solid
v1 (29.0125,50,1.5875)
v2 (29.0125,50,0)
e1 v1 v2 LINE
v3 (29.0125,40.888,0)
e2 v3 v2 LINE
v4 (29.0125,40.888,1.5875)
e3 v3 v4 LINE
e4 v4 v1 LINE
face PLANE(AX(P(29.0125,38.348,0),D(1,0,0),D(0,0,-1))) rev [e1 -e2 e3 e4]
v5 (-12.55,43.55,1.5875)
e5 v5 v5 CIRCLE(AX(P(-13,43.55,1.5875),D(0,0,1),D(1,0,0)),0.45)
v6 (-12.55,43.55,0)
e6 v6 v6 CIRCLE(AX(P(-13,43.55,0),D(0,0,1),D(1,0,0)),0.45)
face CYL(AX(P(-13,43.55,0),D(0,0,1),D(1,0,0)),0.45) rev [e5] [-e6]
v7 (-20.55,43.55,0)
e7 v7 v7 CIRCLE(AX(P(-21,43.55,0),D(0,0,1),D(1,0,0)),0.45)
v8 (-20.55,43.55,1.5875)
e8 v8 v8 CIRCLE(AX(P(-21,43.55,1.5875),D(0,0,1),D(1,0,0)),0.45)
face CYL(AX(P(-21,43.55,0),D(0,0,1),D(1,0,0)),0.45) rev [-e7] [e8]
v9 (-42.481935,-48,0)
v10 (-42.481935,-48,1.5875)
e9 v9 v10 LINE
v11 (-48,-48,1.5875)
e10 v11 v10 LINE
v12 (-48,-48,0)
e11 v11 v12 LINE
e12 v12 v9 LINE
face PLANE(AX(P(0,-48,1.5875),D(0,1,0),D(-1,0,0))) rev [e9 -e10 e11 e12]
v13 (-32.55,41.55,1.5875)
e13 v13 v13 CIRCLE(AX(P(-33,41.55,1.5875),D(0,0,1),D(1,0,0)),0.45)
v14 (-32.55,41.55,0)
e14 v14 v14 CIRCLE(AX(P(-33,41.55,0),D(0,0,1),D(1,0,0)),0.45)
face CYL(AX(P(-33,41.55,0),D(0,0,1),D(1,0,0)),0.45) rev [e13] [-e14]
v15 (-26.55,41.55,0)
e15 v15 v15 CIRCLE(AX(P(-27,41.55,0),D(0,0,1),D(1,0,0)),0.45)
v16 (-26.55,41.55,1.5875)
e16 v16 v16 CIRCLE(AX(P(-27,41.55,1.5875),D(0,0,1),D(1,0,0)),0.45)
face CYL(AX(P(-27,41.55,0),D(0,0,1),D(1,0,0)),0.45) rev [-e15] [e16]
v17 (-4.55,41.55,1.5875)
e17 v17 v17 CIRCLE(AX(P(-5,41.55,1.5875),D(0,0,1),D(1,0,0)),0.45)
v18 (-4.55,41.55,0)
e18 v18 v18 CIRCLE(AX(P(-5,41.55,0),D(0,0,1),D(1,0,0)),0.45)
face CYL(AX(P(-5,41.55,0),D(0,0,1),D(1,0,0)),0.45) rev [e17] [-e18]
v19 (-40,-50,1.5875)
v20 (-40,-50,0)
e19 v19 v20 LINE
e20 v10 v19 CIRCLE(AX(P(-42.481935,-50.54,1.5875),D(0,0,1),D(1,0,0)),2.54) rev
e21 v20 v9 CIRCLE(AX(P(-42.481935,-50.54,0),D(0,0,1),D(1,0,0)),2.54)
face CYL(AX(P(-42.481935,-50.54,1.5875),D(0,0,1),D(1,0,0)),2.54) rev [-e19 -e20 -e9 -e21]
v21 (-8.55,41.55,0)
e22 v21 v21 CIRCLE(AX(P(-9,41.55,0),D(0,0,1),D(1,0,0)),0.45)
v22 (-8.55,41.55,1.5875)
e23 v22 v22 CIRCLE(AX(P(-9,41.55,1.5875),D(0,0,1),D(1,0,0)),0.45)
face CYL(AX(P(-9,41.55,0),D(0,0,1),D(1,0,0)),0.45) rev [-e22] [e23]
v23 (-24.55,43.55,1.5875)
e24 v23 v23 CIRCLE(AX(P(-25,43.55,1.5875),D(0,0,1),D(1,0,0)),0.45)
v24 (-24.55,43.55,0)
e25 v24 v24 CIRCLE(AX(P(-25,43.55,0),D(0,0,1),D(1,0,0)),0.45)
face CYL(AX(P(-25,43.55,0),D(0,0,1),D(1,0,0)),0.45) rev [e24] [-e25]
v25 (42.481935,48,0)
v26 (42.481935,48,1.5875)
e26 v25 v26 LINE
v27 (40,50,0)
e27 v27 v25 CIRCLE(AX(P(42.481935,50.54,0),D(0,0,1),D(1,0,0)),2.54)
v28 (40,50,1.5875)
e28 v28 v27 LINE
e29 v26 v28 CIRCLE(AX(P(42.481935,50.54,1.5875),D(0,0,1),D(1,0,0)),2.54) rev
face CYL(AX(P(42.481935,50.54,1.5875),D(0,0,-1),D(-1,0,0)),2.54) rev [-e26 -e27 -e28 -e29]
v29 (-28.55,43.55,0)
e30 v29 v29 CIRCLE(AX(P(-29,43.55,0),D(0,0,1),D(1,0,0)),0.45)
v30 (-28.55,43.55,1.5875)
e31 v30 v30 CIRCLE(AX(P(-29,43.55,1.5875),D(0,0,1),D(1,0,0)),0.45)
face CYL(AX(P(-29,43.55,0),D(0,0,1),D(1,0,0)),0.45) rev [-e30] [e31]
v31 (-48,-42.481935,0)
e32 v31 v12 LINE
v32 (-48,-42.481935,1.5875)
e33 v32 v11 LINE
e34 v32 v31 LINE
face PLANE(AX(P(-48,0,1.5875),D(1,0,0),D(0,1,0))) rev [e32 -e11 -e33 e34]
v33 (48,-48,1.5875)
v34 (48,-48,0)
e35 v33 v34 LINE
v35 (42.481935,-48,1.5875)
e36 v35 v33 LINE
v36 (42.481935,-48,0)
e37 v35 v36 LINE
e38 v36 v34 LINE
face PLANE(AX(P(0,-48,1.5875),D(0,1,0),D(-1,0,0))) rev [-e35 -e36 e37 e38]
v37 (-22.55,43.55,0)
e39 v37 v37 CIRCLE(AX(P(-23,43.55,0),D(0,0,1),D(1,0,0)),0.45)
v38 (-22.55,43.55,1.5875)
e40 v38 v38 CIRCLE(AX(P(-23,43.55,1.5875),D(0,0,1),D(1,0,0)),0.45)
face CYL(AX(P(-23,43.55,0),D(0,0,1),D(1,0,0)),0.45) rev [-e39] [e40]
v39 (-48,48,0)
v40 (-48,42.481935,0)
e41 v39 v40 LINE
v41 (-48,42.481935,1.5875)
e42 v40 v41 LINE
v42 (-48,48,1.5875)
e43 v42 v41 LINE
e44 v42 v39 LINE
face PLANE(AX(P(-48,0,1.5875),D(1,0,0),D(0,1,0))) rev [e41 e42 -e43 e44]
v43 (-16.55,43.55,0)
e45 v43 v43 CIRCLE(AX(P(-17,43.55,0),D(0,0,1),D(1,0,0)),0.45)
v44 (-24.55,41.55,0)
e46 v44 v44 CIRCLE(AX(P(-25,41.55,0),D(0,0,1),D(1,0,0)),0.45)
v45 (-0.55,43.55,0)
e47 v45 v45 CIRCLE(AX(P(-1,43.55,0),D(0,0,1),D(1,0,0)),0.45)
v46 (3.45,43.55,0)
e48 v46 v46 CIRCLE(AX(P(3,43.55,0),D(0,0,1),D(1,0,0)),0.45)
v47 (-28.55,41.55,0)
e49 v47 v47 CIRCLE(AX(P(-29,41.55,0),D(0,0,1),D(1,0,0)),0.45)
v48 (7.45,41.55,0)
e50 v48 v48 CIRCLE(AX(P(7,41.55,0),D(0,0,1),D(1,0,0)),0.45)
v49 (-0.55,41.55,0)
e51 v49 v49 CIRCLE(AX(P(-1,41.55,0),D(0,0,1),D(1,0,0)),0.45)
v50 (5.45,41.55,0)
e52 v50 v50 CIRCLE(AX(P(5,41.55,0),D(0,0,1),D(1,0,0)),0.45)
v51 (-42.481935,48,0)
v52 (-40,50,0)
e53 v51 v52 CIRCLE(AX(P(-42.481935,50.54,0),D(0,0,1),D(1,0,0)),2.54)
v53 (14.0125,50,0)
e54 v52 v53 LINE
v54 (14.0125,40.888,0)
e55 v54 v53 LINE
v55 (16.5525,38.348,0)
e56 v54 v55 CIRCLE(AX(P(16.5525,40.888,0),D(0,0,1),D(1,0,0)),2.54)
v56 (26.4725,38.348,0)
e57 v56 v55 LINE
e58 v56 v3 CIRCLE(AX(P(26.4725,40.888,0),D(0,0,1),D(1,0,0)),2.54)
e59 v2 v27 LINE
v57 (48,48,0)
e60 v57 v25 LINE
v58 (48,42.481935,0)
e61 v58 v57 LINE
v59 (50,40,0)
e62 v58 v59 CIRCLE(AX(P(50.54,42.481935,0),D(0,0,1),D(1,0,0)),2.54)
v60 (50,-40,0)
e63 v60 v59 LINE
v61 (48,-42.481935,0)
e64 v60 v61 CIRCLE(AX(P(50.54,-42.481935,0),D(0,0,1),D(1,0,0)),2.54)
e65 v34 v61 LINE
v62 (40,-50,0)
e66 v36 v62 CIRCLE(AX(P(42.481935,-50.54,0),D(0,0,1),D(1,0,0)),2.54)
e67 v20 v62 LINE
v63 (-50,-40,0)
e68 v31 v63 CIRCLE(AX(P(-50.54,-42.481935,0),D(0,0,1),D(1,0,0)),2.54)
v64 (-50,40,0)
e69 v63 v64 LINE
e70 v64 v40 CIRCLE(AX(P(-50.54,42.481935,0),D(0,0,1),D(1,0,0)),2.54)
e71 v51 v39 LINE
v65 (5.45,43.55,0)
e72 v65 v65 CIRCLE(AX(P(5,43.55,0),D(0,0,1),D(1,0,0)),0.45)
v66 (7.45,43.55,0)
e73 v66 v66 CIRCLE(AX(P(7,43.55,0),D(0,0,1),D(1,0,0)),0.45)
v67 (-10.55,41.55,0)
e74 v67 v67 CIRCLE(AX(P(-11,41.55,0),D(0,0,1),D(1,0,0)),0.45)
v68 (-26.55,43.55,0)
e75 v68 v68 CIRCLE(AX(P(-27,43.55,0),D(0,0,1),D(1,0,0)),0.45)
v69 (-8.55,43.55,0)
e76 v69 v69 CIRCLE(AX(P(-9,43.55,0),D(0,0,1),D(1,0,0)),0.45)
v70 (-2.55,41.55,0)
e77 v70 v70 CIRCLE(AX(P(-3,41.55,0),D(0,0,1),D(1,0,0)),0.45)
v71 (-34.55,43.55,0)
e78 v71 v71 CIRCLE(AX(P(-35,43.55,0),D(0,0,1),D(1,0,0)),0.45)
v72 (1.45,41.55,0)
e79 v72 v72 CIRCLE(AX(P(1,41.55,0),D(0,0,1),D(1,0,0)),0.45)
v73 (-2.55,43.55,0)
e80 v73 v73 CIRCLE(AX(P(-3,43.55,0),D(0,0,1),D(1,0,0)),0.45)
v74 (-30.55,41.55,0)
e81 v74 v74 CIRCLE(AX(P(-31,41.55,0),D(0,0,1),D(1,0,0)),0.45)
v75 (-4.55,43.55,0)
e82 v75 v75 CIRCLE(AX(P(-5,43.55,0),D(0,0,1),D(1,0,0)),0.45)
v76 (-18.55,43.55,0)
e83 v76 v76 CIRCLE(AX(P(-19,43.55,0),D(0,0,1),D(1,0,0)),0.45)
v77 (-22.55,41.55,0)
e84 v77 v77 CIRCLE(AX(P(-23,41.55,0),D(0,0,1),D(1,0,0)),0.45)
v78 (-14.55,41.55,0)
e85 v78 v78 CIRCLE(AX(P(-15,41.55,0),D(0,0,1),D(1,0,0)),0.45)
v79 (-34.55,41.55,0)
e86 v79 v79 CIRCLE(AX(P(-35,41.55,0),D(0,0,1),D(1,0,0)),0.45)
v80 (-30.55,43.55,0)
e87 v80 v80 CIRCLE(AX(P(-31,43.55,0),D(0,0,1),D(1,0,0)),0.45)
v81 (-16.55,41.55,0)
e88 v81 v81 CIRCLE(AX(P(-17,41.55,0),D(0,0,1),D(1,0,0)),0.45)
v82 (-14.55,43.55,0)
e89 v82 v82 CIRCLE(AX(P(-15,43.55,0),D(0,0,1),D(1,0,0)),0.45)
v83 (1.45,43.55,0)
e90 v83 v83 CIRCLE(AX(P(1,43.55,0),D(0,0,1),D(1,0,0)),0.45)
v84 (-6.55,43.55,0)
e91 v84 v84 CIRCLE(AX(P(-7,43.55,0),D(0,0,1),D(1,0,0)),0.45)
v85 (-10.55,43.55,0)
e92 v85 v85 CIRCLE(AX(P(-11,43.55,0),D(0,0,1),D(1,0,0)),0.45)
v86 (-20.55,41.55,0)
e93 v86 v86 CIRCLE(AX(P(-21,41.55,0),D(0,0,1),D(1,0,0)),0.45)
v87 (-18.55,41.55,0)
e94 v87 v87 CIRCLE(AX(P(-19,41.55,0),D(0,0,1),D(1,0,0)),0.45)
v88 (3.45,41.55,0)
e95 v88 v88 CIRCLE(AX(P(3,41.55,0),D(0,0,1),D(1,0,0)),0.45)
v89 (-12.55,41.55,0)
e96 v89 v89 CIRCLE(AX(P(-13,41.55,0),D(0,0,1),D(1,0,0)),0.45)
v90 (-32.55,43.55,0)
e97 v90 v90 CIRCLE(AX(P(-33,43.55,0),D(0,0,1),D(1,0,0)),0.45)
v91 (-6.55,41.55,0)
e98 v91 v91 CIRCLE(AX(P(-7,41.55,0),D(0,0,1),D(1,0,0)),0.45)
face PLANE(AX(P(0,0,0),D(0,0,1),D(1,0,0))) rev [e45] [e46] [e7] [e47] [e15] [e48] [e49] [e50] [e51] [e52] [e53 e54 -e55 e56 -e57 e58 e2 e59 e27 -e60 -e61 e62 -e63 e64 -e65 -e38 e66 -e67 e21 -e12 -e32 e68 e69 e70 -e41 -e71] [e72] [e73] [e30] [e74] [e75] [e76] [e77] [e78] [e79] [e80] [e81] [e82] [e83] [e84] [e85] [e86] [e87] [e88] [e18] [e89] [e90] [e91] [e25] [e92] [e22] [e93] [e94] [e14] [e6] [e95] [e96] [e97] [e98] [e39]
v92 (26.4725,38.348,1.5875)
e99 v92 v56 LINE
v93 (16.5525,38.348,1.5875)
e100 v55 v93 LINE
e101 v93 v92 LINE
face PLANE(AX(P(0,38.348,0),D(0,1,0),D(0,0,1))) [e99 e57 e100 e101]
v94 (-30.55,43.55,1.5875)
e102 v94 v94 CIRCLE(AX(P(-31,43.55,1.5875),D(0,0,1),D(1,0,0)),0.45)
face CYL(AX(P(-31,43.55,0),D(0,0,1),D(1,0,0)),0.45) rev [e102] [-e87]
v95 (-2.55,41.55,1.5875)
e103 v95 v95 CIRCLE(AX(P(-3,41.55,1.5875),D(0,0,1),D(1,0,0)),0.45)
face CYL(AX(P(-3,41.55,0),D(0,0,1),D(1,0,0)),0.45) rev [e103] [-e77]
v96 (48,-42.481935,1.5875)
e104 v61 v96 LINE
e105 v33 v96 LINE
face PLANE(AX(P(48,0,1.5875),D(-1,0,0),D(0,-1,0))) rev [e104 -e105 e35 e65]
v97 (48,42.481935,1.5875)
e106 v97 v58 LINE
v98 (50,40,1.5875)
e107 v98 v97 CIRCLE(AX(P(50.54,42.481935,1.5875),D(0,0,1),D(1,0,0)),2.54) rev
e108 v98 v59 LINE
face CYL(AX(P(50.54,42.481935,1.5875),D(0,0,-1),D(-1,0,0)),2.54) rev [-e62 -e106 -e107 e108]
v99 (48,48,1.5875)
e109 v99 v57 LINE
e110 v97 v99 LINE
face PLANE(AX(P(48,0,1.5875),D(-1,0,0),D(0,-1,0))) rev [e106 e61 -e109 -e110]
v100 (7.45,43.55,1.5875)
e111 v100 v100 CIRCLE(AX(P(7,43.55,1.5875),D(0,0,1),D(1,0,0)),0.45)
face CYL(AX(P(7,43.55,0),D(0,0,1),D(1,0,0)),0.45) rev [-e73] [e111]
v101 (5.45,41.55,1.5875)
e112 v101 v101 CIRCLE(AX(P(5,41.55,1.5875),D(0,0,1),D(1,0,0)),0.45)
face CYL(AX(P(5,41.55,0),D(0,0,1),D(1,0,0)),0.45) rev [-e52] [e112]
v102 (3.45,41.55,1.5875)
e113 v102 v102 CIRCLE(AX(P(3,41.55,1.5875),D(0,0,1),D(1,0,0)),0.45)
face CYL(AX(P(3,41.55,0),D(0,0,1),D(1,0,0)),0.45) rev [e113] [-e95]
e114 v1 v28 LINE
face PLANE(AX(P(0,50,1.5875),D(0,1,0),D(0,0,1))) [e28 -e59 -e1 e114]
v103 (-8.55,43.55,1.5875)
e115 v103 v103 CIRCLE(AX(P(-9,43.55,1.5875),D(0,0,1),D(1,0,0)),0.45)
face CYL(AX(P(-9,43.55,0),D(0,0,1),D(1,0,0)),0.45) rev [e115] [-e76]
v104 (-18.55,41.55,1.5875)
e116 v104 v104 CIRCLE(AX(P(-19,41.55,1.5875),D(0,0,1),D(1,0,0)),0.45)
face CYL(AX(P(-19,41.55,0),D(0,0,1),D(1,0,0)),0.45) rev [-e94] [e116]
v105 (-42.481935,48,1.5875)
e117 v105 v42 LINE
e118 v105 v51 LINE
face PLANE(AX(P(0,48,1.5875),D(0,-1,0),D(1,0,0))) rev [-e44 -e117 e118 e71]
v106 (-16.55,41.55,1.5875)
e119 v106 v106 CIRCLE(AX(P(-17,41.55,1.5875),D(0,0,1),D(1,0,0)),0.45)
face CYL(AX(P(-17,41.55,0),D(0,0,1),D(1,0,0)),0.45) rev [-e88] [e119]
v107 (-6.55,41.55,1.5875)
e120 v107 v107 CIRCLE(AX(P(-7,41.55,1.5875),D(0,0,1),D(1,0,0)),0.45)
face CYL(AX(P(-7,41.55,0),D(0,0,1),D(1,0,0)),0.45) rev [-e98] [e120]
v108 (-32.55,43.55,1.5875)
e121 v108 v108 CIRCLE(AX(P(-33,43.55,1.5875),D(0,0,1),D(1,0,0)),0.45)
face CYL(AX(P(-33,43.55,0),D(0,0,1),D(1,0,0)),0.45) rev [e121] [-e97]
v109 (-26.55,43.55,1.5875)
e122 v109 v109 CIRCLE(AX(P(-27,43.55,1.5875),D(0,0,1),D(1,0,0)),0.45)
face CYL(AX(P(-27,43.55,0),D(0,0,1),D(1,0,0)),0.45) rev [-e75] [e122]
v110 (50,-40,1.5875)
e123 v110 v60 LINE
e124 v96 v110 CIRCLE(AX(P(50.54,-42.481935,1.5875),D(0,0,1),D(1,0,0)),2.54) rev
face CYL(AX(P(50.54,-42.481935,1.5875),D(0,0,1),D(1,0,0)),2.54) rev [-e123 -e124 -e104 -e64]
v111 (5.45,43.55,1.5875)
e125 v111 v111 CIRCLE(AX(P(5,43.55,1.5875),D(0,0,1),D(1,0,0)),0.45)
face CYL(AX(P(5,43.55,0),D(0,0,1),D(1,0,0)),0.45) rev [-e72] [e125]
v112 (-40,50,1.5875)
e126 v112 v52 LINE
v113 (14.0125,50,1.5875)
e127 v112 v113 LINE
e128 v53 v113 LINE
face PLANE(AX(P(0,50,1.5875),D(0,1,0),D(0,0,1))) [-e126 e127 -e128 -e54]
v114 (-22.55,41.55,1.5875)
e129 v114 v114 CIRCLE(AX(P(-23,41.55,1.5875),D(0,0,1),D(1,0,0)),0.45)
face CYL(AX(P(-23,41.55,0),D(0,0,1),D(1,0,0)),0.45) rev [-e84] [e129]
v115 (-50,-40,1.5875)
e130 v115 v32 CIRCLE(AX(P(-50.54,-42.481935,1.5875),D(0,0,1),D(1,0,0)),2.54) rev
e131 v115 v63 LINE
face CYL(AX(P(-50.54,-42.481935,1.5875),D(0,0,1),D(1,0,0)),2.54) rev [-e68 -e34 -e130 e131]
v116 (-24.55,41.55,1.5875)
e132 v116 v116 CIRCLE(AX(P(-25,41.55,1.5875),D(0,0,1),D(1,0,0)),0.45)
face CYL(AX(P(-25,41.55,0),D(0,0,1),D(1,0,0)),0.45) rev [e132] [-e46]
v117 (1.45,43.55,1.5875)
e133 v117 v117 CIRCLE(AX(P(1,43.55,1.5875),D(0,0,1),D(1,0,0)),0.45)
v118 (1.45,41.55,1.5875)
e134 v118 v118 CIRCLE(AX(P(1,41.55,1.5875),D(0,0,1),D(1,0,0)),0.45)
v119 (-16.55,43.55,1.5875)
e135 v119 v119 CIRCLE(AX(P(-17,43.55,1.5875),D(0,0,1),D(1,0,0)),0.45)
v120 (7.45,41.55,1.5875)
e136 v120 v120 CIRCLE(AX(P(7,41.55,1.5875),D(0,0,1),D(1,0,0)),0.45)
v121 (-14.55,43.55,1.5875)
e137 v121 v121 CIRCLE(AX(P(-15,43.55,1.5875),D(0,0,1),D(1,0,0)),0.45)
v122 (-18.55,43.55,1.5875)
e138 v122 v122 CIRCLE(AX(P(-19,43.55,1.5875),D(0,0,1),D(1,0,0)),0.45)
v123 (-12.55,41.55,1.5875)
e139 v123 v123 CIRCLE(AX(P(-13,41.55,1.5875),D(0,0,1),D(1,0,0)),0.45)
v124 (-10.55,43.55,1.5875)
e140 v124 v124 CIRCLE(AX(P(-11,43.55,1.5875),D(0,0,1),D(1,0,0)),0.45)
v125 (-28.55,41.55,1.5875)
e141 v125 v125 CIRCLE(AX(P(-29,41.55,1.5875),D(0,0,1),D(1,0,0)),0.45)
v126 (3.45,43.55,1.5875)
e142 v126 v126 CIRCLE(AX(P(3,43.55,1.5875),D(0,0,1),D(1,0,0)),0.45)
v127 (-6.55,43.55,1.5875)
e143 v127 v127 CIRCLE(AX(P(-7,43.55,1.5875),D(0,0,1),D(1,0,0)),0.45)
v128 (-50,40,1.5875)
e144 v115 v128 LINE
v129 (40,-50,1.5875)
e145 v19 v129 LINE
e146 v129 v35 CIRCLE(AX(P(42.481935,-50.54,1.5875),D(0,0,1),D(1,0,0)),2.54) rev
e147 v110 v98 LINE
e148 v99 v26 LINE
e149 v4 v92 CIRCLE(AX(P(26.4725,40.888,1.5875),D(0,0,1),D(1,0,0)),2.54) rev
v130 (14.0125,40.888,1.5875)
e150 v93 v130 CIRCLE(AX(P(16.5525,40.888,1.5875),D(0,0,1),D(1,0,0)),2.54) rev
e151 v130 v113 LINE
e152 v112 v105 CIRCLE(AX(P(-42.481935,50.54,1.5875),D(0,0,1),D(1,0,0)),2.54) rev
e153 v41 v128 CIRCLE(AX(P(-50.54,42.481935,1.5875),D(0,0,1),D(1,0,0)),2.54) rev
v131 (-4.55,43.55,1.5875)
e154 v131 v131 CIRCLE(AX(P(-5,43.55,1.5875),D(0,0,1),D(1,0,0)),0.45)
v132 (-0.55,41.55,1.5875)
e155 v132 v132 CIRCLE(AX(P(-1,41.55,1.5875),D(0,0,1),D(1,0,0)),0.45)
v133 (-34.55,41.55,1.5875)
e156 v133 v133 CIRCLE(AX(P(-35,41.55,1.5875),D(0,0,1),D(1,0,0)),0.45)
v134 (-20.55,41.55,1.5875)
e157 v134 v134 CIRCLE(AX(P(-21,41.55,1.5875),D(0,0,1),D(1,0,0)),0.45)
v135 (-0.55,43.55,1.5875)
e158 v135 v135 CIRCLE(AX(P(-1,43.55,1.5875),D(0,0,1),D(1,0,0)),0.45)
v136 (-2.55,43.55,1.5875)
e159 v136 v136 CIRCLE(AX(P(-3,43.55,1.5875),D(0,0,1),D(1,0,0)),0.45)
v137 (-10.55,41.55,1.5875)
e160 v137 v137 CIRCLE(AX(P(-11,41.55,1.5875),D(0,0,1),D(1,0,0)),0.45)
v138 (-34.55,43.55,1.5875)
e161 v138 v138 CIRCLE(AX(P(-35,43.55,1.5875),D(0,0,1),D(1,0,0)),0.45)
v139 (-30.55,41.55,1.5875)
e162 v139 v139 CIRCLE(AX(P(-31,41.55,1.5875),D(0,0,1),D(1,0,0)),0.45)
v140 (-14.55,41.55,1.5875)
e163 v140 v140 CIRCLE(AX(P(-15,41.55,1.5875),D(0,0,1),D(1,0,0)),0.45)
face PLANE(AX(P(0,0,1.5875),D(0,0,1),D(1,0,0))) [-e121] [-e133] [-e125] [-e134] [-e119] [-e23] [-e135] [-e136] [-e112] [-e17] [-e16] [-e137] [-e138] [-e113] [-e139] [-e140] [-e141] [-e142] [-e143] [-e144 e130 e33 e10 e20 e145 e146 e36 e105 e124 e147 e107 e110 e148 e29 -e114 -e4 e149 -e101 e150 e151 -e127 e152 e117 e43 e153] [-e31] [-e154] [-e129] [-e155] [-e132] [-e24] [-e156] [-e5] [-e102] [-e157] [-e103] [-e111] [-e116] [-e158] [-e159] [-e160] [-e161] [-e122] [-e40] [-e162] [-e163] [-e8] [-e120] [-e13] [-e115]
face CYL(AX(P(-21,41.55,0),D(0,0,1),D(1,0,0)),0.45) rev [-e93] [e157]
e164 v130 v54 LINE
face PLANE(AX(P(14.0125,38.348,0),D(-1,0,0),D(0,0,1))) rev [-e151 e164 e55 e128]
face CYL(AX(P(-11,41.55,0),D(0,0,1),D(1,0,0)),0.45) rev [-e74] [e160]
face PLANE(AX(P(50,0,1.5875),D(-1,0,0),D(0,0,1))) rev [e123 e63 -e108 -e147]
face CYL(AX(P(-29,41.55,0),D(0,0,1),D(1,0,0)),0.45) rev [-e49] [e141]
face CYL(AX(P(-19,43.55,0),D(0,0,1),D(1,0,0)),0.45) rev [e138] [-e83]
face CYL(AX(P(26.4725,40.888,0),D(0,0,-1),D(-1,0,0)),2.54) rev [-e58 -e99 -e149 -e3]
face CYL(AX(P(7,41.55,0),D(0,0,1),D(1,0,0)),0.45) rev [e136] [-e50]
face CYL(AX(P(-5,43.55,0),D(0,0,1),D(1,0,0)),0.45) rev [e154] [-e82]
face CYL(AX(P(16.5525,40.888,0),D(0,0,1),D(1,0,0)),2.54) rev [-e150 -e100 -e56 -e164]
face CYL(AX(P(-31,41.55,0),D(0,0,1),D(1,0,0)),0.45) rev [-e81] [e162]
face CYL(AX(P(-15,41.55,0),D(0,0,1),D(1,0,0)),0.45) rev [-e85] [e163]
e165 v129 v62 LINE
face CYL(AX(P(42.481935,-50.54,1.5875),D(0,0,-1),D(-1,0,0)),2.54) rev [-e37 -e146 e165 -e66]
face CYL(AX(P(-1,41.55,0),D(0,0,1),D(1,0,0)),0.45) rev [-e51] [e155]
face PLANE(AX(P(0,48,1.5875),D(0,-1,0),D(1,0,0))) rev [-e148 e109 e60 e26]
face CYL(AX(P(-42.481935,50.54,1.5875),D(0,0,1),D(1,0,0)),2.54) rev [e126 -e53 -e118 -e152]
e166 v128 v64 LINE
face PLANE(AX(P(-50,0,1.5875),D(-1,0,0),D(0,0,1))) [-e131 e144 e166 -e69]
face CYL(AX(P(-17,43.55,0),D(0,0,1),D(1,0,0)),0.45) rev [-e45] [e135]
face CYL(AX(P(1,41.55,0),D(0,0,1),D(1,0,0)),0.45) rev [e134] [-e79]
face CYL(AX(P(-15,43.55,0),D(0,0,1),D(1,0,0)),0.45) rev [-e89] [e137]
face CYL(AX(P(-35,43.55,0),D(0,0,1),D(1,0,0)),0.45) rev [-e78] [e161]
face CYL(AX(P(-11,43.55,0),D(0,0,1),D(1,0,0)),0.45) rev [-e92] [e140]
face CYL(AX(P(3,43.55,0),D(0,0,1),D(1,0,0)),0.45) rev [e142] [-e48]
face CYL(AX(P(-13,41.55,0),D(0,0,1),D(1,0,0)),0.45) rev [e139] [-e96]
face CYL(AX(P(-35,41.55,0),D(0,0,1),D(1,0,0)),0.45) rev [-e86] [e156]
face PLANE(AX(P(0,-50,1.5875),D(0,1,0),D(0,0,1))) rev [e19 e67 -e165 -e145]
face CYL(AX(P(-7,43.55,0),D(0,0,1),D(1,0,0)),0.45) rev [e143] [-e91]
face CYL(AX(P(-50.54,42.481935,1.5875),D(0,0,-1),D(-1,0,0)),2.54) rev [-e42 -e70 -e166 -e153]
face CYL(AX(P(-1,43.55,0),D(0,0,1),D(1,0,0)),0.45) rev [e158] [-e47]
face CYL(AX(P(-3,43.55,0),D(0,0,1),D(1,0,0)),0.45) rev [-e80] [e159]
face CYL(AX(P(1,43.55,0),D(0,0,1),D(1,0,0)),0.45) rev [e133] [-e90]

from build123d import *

# Parameters (mm, degrees)
BOSS_EXTRUDE1_DEPTH = 1.5875
FILLET1_R           = 2.54
SKETCH2_R           = 0.45
CUT_EXTRUDE1_DEPTH  = 71.728496069
SKETCH3_W           = 15
SKETCH3_H           = 1.5875
CUT_EXTRUDE2_DEPTH  = 11.652
FILLET2_R           = 2.54


with BuildPart() as part:
    # Sketch1 → Boss-Extrude1 (new body)
    with BuildSketch(Plane.XY):
        Polygon((40, 50), (-40, 50), (-40, 48), (-48, 48), (-48, 40), (-50, 40), (-50, -37.864895224), (-50, -40), (-48, -40), (-48, -48), (-40, -48), (-40, -50), (-37.864895224, -50), (40, -50), (40, -48), (48, -48), (48, -40), (50, -40), (50, 40), (48, 40), (48, 48), (40, 48), align=None)
    extrude(amount=BOSS_EXTRUDE1_DEPTH)

    # Fillet1
    # the kernel refuses this fillet: 2.54 mm, written as the material it adds along each edge
    with BuildSketch(Plane(origin=(-48, -40, 0), x_dir=(0, -1, 0), z_dir=(0, 0, 1)), Plane(origin=(40, -48, 0), x_dir=(1, 0, 0), z_dir=(0, 0, 1)), Plane(origin=(48, 40, 0), x_dir=(0, 1, 0), z_dir=(0, 0, 1)), Plane(origin=(-40, 48, 0), x_dir=(-1, 0, 0), z_dir=(0, 0, 1))) as fillet1_piece_1:
        with BuildLine():
            CenterArc((2.481934729, -2.54), FILLET1_R, 90, 77.725329785)
            Line((0, -2), (-0.049638695, -1.9892))
            ThreePointArc((-0.049638695, -1.9892), (-0.0508, -1), (-0.0508, 0))
            Line((-0.0508, 0), (0, 0.0508))
            Line((0, 0.0508), (2.481934729, 0.0508))
            Line((2.481934729, 0.0508), (2.481934729, 0))
        make_face()
    extrude(amount=1.5875)
    with BuildSketch(Plane(origin=(-40, -48, 0), x_dir=(-3.737454790095179e-12, -1.0, 0), z_dir=(0, 0, 1)), Plane(origin=(48, -40, 0), x_dir=(1.0, -3.7339020764163554e-12, 0), z_dir=(0, 0, 1)), Plane(origin=(-48, 40, 0), x_dir=(-1.0, 3.737454790095126e-12, 0), z_dir=(0, 0, 1))) as fillet1_piece_2:
        with BuildLine():
            CenterArc((2.54, -2.481934729), FILLET1_R, 102.274670215, 77.725329785)
            Line((0, -2.481934729), (-0.0508, -2.481934729))
            Line((-0.0508, -2.481934729), (-0.0508, 0))
            Line((-0.0508, 0), (0, 0.0508))
            ThreePointArc((0, 0.0508), (1, 0.0508), (1.9892, 0.049638695))
            Line((1.9892, 0.049638695), (2, 0))
        make_face()
    extrude(amount=1.5875)
    with BuildSketch(Plane(origin=(40, 48, 0), x_dir=(1, 0, 0), z_dir=(0, 0, 1))) as fillet1_piece_3:
        with BuildLine():
            CenterArc((2.481934729, 2.54), FILLET1_R, 192.274670215, 77.725329785)
            Line((0, 2), (-0.049638695, 1.9892))
            ThreePointArc((-0.049638695, 1.9892), (-0.0508, 1), (-0.0508, 0))
            Line((-0.0508, 0), (0, -0.0508))
            Line((0, -0.0508), (2.481934729, -0.0508))
            Line((2.481934729, -0.0508), (2.481934729, 0))
        make_face()
    extrude(amount=1.5875)

    # Sketch2 → Cut-Extrude1 (cut, through all)
    with BuildSketch(Plane.XY.offset(1.5875)):
        with Locations((-35, 43.55)):
            Circle(SKETCH2_R)
        with Locations((-33, 43.55)):
            Circle(SKETCH2_R)
        with Locations((-31, 43.55)):
            Circle(SKETCH2_R)
        with Locations((-29, 43.55)):
            Circle(SKETCH2_R)
        with Locations((-27, 43.55)):
            Circle(SKETCH2_R)
        with Locations((-25, 43.55)):
            Circle(SKETCH2_R)
        with Locations((-23, 43.55)):
            Circle(SKETCH2_R)
        with Locations((-21, 43.55)):
            Circle(SKETCH2_R)
        with Locations((-19, 43.55)):
            Circle(SKETCH2_R)
        with Locations((-17, 43.55)):
            Circle(SKETCH2_R)
        with Locations((-15, 43.55)):
            Circle(SKETCH2_R)
        with Locations((-13, 43.55)):
            Circle(SKETCH2_R)
        with Locations((-11, 43.55)):
            Circle(SKETCH2_R)
        with Locations((-9, 43.55)):
            Circle(SKETCH2_R)
        with Locations((-7, 43.55)):
            Circle(SKETCH2_R)
        with Locations((-5, 43.55)):
            Circle(SKETCH2_R)
        with Locations((-3, 43.55)):
            Circle(SKETCH2_R)
        with Locations((-1, 43.55)):
            Circle(SKETCH2_R)
        with Locations((1, 43.55)):
            Circle(SKETCH2_R)
        with Locations((3, 43.55)):
            Circle(SKETCH2_R)
        with Locations((5, 43.55)):
            Circle(SKETCH2_R)
        with Locations((7, 43.55)):
            Circle(SKETCH2_R)
        with Locations((-33, 41.55)):
            Circle(SKETCH2_R)
        with Locations((-31, 41.55)):
            Circle(SKETCH2_R)
        with Locations((-29, 41.55)):
            Circle(SKETCH2_R)
        with Locations((-27, 41.55)):
            Circle(SKETCH2_R)
        with Locations((-25, 41.55)):
            Circle(SKETCH2_R)
        with Locations((-23, 41.55)):
            Circle(SKETCH2_R)
        with Locations((-21, 41.55)):
            Circle(SKETCH2_R)
        with Locations((-19, 41.55)):
            Circle(SKETCH2_R)
        with Locations((-17, 41.55)):
            Circle(SKETCH2_R)
        with Locations((-15, 41.55)):
            Circle(SKETCH2_R)
        with Locations((-13, 41.55)):
            Circle(SKETCH2_R)
        with Locations((-11, 41.55)):
            Circle(SKETCH2_R)
        with Locations((-9, 41.55)):
            Circle(SKETCH2_R)
        with Locations((-7, 41.55)):
            Circle(SKETCH2_R)
        with Locations((-5, 41.55)):
            Circle(SKETCH2_R)
        with Locations((-3, 41.55)):
            Circle(SKETCH2_R)
        with Locations((-1, 41.55)):
            Circle(SKETCH2_R)
        with Locations((1, 41.55)):
            Circle(SKETCH2_R)
        with Locations((3, 41.55)):
            Circle(SKETCH2_R)
        with Locations((5, 41.55)):
            Circle(SKETCH2_R)
        with Locations((7, 41.55)):
            Circle(SKETCH2_R)
        with Locations((-35, 41.55)):
            Circle(SKETCH2_R)
    extrude(amount=-CUT_EXTRUDE1_DEPTH, mode=Mode.SUBTRACT)

    # Sketch3 → Cut-Extrude2 (cut)
    with BuildSketch(Plane(origin=(0, 50, 0), x_dir=(1, 0, 0), z_dir=(0, 1, 0))):
        with Locations((21.5125, -0.79375)):
            Rectangle(SKETCH3_W, SKETCH3_H)
    extrude(amount=-CUT_EXTRUDE2_DEPTH, mode=Mode.SUBTRACT)

    # Fillet2
    fillet2_edges = [part.edges().sort_by_distance(p)[0] for p in [
        (14.0125, 38.348, 0.79375),
        (29.0125, 38.348, 0.79375),
    ]]
    fillet(fillet2_edges, radius=FILLET2_R)


solid = part.part
